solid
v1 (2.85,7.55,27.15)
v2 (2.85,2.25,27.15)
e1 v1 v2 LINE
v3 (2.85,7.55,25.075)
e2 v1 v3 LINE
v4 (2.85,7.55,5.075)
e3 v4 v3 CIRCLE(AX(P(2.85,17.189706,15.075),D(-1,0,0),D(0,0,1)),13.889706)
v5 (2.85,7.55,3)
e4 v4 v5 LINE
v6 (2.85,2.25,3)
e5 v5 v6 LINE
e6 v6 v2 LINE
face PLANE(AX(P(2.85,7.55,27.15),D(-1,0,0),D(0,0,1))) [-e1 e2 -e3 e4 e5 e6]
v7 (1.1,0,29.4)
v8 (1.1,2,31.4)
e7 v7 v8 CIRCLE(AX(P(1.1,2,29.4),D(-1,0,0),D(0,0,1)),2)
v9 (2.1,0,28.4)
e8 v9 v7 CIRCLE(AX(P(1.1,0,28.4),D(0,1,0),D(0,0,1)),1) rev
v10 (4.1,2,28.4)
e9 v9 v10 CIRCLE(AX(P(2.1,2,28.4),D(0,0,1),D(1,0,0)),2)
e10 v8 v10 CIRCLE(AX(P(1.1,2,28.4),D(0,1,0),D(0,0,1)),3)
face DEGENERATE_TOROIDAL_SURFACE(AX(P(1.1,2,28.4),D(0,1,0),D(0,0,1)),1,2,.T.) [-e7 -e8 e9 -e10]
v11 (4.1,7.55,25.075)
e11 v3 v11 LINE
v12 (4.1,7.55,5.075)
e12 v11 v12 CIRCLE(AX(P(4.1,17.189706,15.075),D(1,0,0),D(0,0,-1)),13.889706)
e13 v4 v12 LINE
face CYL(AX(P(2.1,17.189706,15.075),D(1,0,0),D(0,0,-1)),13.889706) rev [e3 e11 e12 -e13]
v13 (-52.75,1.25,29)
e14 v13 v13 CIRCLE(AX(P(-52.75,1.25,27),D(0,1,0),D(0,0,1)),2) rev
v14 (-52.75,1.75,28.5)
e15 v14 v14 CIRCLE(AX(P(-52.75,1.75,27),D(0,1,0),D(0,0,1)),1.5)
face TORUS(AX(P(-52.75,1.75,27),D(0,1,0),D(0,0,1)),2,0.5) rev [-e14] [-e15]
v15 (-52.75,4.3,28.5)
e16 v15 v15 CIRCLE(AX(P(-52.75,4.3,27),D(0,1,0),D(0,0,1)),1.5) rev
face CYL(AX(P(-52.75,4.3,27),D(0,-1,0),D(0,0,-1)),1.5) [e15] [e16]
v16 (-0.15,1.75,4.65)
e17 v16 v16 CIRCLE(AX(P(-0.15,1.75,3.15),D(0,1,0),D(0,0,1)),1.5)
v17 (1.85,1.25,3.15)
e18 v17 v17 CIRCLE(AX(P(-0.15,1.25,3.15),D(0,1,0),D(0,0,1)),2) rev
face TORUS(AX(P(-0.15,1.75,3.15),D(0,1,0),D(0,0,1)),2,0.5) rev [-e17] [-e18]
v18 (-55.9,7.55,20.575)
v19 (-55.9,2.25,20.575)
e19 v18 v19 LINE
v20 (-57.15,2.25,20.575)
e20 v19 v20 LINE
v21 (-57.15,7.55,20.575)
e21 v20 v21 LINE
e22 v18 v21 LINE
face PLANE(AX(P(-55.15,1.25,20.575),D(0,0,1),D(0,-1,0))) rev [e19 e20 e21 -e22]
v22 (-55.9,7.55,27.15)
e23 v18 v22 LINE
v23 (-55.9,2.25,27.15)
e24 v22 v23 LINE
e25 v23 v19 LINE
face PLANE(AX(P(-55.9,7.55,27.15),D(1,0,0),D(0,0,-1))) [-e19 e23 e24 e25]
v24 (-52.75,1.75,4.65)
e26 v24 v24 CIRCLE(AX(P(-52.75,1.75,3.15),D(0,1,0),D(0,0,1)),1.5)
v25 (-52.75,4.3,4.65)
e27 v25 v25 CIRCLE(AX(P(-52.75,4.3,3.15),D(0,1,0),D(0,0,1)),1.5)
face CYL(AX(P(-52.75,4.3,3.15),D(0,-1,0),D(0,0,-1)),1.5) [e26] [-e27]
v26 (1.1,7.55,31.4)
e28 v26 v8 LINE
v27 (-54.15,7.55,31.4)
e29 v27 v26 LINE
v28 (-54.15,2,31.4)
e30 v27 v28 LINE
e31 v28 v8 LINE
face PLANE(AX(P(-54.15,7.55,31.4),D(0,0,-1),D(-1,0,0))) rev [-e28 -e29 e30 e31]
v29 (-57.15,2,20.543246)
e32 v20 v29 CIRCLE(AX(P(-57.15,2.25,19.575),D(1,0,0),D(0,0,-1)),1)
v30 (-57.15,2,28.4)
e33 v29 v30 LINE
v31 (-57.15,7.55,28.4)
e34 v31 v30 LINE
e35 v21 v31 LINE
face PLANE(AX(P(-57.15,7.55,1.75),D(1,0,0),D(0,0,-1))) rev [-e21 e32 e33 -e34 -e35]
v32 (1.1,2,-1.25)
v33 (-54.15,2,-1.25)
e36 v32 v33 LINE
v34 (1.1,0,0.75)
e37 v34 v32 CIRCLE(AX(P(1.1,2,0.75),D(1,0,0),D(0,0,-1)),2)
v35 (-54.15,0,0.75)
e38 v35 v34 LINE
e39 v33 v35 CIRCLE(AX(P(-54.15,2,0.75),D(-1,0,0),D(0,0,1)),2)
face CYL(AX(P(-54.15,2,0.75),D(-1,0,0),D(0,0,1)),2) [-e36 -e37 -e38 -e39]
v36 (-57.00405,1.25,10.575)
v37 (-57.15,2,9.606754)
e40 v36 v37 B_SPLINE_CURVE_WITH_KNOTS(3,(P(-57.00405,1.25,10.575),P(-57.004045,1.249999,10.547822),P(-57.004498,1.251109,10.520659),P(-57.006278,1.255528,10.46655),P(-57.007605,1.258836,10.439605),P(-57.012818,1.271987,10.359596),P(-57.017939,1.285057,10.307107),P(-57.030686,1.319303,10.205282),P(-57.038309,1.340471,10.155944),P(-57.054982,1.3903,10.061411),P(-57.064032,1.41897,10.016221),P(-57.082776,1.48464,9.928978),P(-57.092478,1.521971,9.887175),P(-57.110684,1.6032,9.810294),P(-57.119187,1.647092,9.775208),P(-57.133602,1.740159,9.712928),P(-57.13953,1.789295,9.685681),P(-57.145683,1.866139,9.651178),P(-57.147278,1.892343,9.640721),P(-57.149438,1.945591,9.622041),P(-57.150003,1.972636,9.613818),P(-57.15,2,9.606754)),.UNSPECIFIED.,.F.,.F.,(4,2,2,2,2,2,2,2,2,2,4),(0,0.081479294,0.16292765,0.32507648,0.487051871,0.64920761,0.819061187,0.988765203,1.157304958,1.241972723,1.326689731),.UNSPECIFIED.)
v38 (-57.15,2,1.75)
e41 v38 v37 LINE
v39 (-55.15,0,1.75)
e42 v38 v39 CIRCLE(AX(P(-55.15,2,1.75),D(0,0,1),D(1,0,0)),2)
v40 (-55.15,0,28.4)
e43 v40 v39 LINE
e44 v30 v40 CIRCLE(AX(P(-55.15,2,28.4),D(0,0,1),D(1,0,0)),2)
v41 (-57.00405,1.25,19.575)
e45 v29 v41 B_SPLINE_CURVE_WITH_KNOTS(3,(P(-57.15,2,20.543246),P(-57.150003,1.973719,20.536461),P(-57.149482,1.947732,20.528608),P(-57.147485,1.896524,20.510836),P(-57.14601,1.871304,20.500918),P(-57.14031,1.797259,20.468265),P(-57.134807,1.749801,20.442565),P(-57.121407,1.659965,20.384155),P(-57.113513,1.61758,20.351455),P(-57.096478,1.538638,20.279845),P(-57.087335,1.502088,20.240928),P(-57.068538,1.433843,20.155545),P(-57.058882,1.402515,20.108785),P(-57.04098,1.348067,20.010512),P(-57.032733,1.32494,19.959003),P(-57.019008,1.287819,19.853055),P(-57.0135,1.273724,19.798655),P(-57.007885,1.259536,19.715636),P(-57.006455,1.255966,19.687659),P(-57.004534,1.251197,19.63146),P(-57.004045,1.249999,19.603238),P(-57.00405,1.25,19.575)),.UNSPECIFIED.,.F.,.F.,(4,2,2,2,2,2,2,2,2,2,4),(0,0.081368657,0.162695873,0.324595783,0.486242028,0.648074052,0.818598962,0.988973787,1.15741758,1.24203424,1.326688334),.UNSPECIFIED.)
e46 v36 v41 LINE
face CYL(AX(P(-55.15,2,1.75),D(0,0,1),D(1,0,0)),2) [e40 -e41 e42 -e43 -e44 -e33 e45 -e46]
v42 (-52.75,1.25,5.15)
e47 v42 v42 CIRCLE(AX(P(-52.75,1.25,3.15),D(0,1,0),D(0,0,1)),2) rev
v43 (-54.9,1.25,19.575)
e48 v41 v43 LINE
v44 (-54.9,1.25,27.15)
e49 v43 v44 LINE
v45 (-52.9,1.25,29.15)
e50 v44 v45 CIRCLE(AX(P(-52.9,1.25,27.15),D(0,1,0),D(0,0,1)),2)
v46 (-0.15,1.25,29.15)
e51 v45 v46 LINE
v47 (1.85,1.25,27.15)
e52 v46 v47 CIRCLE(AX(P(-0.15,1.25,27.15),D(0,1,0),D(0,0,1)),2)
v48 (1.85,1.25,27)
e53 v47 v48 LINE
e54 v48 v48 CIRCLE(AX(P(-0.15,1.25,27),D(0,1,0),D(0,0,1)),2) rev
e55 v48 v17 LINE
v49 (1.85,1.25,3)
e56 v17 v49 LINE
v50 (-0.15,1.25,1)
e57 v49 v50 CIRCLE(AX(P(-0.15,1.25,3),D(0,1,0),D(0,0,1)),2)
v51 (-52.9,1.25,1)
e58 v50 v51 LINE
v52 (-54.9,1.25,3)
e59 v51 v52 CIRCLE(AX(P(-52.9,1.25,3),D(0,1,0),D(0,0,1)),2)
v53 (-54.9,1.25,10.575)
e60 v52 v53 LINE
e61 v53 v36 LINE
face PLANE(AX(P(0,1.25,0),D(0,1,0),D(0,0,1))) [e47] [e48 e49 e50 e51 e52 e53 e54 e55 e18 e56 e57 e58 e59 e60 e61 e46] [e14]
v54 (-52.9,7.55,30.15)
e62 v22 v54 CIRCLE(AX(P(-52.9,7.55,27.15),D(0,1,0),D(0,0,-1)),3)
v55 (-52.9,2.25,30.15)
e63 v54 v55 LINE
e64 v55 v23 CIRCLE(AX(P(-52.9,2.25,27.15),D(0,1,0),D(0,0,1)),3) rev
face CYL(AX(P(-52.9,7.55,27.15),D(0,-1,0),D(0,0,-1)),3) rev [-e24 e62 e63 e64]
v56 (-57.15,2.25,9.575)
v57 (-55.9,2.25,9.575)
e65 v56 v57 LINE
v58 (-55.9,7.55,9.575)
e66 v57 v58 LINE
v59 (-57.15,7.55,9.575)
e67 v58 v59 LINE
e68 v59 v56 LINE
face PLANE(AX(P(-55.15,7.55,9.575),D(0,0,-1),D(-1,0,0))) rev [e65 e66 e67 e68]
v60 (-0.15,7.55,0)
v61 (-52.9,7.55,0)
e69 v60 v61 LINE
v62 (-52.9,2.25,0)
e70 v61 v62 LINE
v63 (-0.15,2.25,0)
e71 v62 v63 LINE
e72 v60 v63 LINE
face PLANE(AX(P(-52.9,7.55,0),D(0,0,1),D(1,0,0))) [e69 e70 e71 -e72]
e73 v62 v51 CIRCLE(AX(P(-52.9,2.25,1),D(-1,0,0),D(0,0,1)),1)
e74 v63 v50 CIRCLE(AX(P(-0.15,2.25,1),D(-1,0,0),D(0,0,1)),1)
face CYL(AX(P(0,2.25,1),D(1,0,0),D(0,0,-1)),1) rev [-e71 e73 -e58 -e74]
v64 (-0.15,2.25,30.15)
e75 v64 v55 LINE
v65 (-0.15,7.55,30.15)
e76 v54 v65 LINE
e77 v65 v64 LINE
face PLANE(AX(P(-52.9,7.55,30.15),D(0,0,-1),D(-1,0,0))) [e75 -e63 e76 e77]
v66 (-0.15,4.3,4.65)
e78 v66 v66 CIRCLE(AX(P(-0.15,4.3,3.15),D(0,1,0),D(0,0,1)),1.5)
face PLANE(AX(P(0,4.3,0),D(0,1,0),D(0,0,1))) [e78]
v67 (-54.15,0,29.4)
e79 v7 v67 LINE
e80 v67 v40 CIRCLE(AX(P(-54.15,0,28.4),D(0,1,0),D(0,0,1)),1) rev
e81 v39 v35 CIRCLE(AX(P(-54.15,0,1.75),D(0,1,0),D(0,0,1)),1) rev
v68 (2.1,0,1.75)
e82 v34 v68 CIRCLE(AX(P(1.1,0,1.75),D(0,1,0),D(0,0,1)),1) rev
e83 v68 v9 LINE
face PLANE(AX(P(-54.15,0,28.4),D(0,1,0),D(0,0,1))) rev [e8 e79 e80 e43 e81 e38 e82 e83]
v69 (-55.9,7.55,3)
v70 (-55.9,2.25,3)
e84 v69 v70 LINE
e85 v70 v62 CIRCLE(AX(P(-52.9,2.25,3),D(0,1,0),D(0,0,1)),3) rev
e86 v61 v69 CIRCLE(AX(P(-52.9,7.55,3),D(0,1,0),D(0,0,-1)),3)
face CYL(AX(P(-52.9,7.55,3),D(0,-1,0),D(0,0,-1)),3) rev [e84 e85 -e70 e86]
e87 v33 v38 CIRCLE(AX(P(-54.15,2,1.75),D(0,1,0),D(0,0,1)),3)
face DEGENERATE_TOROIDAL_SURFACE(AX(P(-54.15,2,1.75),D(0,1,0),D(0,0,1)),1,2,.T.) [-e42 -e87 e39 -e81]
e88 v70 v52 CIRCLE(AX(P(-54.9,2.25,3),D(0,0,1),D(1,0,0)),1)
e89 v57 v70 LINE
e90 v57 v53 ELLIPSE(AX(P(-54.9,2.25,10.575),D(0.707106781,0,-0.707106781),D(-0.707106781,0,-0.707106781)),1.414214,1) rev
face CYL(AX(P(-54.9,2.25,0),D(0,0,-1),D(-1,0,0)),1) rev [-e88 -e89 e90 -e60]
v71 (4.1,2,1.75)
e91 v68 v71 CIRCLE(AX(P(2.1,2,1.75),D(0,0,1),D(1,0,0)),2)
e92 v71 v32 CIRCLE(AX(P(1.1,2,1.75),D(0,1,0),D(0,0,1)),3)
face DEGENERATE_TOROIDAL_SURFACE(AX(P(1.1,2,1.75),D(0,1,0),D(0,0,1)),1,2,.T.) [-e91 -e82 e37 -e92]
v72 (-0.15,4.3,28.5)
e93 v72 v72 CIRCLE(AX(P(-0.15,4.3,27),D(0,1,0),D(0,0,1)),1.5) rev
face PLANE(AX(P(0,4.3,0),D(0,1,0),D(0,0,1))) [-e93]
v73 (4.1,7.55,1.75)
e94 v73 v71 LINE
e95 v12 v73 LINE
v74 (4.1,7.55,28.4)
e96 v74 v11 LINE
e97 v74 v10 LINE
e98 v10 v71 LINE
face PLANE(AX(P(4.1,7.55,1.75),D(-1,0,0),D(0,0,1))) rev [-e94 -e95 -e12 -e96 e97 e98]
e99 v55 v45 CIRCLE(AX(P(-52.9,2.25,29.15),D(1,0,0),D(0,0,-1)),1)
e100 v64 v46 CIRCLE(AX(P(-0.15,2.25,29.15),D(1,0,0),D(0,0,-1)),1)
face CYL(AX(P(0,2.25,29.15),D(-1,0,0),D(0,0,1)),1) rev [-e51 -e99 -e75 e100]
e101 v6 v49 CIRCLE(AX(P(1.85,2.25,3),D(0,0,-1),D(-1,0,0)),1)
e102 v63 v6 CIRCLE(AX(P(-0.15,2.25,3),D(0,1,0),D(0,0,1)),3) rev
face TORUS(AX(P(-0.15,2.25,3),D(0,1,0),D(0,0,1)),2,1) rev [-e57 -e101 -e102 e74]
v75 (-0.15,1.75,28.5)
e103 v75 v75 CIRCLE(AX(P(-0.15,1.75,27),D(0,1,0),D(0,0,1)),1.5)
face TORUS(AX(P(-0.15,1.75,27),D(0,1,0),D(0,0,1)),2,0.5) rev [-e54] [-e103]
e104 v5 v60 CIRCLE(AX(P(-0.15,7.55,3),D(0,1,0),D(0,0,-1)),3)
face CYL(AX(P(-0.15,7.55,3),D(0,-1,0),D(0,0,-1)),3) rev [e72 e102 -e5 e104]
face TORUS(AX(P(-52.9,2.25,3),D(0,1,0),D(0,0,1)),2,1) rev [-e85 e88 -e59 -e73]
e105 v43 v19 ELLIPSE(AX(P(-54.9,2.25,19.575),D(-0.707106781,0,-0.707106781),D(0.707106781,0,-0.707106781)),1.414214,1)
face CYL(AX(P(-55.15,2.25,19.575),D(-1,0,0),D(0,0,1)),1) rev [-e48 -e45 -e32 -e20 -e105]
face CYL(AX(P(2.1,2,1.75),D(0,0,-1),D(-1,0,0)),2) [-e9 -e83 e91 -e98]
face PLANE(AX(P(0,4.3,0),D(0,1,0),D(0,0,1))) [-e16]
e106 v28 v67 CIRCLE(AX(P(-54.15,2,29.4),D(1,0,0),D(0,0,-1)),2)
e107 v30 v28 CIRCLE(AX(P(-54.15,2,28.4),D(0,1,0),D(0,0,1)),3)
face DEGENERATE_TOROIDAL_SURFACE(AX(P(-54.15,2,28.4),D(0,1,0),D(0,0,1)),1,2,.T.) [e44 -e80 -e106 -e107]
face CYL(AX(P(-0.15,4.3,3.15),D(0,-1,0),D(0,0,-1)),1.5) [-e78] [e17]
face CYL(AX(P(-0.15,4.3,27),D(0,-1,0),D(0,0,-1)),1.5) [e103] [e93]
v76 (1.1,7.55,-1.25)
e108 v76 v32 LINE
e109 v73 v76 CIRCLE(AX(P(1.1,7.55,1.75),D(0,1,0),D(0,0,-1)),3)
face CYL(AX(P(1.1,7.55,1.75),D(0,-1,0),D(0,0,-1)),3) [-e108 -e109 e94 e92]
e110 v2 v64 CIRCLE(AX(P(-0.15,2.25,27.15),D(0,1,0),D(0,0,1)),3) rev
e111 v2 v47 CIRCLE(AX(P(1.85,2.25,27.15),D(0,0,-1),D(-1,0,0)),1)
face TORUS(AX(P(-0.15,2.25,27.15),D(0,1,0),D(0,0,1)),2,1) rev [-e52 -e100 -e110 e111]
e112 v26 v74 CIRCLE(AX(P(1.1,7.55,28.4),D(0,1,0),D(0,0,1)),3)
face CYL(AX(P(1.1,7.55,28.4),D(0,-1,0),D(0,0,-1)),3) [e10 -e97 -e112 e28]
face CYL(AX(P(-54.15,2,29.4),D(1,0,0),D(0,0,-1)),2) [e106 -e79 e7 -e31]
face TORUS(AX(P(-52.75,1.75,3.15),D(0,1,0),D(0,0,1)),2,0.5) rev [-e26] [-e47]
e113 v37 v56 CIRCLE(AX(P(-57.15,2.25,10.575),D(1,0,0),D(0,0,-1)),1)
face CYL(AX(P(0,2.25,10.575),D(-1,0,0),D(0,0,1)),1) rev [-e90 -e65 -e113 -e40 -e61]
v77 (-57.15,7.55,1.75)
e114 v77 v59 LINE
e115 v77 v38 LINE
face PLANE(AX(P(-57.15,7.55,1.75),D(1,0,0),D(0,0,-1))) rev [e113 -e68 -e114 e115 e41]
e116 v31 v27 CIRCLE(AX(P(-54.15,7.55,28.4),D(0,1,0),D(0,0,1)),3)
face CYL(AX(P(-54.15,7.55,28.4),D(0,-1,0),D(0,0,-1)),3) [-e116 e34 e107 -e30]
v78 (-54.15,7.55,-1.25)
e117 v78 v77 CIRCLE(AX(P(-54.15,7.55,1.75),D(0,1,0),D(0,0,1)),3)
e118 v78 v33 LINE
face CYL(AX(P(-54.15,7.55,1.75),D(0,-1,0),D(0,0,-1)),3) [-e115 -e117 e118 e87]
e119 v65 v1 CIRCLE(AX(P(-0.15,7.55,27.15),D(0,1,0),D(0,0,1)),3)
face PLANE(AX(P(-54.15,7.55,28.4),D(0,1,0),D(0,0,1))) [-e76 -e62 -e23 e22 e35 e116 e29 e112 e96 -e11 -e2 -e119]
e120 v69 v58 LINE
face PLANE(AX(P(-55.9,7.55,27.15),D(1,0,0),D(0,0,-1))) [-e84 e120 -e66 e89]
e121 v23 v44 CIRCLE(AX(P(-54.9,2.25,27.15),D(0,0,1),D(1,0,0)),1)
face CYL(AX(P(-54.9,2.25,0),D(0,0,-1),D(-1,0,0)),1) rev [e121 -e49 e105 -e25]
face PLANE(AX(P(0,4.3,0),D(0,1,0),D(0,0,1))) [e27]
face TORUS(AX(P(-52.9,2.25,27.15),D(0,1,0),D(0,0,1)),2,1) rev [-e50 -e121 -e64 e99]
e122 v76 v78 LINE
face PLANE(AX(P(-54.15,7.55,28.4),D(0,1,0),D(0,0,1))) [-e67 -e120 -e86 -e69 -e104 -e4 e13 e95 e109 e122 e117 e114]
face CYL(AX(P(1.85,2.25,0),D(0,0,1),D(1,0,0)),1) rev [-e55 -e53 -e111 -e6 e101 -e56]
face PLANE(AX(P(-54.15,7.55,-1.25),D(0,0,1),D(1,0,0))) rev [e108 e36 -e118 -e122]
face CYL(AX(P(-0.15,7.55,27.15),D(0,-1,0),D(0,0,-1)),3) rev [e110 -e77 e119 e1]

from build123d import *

# Parameters (mm, degrees)
BOSS_EXTRUDE2_DEPTH = 7.55
SKETCH3_W           = 58.75
SKETCH3_H           = 30.15
BOSS_EXTRUDE3_DEPTH = 1.25
SKETCH5_R           = 1.5
BOSS_EXTRUDE4_DEPTH = 3.05
FILLET1_R           = 0.5
FILLET4_R           = 2
SKETCH7_W           = 11
SKETCH7_H           = 6.3
CUT_EXTRUDE1_DEPTH  = 2
FILLET7_R           = 1
CUT_EXTRUDE2_DEPTH  = 2
FILLET8_R           = 1


with BuildPart() as part:
    # Sketch2 → Boss-Extrude2 (new body)
    with BuildSketch(Plane(origin=(0, 0, 0), x_dir=(1, 0, 0), z_dir=(0, 1, 0))):
        with BuildLine():
            Line((-54.15, 1.25), (1.1, 1.25))
            ThreePointArc((1.1, 1.25), (3.221320344, 0.371320344), (4.1, -1.75))
            Line((4.1, -1.75), (4.1, -28.4))
            ThreePointArc((4.1, -28.4), (3.221320344, -30.521320344), (1.1, -31.4))
            Line((1.1, -31.4), (-54.15, -31.4))
            ThreePointArc((-54.15, -31.4), (-56.271320344, -30.521320344), (-57.15, -28.4))
            Line((-57.15, -28.4), (-57.15, -1.75))
            ThreePointArc((-57.15, -1.75), (-56.271320344, 0.371320344), (-54.15, 1.25))
        make_face()
        with BuildLine():
            Line((-52.9, -30.15), (-0.15, -30.15))
            ThreePointArc((-0.15, -30.15), (1.971320344, -29.271320344), (2.85, -27.15))
            Line((2.85, -27.15), (2.85, -3))
            ThreePointArc((2.85, -3), (1.971320344, -0.878679656), (-0.15, 0))
            Line((-0.15, 0), (-52.9, 0))
            ThreePointArc((-52.9, 0), (-55.021320344, -0.878679656), (-55.9, -3))
            Line((-55.9, -3), (-55.9, -27.15))
            ThreePointArc((-55.9, -27.15), (-55.021320344, -29.271320344), (-52.9, -30.15))
        make_face(mode=Mode.SUBTRACT)
    extrude(amount=BOSS_EXTRUDE2_DEPTH)

    # Sketch3 → Boss-Extrude3 (add)
    with BuildSketch(Plane(origin=(0, 0, 0), x_dir=(1, 0, 0), z_dir=(0, 1, 0))):
        with Locations((-26.525, -15.075)):
            Rectangle(SKETCH3_W, SKETCH3_H)
    extrude(amount=BOSS_EXTRUDE3_DEPTH)

    # Sketch5 → Boss-Extrude4 (add)
    with BuildSketch(Plane(origin=(0, 1.25, 0), x_dir=(1, 0, 0), z_dir=(0, 1, 0))):
        with Locations(Location((-52.75, -3.15, 0), (0, 0, 270))):
            Circle(SKETCH5_R)
        with Locations(Location((-0.15, -3.15, 0), (0, 0, 270))):
            Circle(SKETCH5_R)
        with Locations(Location((-0.15, -27, 0), (0, 0, 270))):
            Circle(SKETCH5_R)
        with Locations(Location((-52.75, -27, 0), (0, 0, 270))):
            Circle(SKETCH5_R)
    extrude(amount=BOSS_EXTRUDE4_DEPTH)

    # Fillet1
    fillet1_edges = [part.edges().sort_by_distance(p)[0] for p in [
        (-52.75, 1.25, 25.5),
        (-52.75, 1.25, 1.65),
        (-0.15, 1.25, 1.65),
        (-0.15, 1.25, 25.5),
    ]]
    fillet(fillet1_edges, radius=FILLET1_R)

    # Fillet4
    fillet4_edges = [part.edges().sort_by_distance(p)[0] for p in [
        (4.1, 0, 15.075),
        (3.221320344, 0, 30.521320344),
        (-26.525, 0, 31.4),
        (-56.271320344, 0, 30.521320344),
        (-57.15, 0, 15.075),
        (-56.271320344, 0, -0.371320344),
        (-26.525, 0, -1.25),
        (3.221320344, 0, -0.371320344),
    ]]
    fillet(fillet4_edges, radius=FILLET4_R)

    # Sketch7 → Cut-Extrude1 (cut)
    with BuildSketch(Plane.ZY.offset(57.15)):
        with Locations((15.075, 4.4)):
            Rectangle(SKETCH7_W, SKETCH7_H)
    extrude(amount=-CUT_EXTRUDE1_DEPTH, mode=Mode.SUBTRACT)

    # Fillet7
    fillet7_edges = [part.edges().sort_by_distance(p)[0] for p in [
        (-55.9, 1.25, 23.8625),
        (-55.9, 1.25, 6.2875),
        (-55.021320344, 1.25, 29.271320344),
        (-26.525, 1.25, 30.15),
        (1.971320344, 1.25, 29.271320344),
        (2.85, 1.25, 15.075),
        (1.971320344, 1.25, 0.878679656),
        (-26.525, 1.25, 0),
        (-55.021320344, 1.25, 0.878679656),
    ]]
    fillet(fillet7_edges, radius=FILLET7_R - 0.0001)  # a hair under: the kernel refuses the full size

    # Sketch8 → Cut-Extrude2 (cut)
    with BuildSketch(Plane(origin=(4.1, 0, 0), x_dir=(0, 0, -1), z_dir=(1, 0, 0))):
        with BuildLine():
            Line((-5.075, 7.55), (-15.075, 7.55))
            Line((-15.075, 7.55), (-15.075, 3.3))
            ThreePointArc((-15.075, 3.3), (-9.642171547, 4.406580111), (-5.075, 7.55))
        make_face()
        with BuildLine():
            Line((-15.075, 3.3), (-15.075, 7.55))
            Line((-15.075, 7.55), (-25.075, 7.55))
            ThreePointArc((-25.075, 7.55), (-20.507828453, 4.406580111), (-15.075, 3.3))
        make_face()
    extrude(amount=-CUT_EXTRUDE2_DEPTH, mode=Mode.SUBTRACT)

    # Fillet8
    fillet8_edges = [part.edges().sort_by_distance(p)[0] for p in [
        (-55.952074811, 1.25, 20.575),
        (-55.952074811, 1.25, 9.575),
    ]]
    fillet(fillet8_edges, radius=FILLET8_R - 0.0001)  # a hair under: the kernel refuses the full size


solid = part.part
